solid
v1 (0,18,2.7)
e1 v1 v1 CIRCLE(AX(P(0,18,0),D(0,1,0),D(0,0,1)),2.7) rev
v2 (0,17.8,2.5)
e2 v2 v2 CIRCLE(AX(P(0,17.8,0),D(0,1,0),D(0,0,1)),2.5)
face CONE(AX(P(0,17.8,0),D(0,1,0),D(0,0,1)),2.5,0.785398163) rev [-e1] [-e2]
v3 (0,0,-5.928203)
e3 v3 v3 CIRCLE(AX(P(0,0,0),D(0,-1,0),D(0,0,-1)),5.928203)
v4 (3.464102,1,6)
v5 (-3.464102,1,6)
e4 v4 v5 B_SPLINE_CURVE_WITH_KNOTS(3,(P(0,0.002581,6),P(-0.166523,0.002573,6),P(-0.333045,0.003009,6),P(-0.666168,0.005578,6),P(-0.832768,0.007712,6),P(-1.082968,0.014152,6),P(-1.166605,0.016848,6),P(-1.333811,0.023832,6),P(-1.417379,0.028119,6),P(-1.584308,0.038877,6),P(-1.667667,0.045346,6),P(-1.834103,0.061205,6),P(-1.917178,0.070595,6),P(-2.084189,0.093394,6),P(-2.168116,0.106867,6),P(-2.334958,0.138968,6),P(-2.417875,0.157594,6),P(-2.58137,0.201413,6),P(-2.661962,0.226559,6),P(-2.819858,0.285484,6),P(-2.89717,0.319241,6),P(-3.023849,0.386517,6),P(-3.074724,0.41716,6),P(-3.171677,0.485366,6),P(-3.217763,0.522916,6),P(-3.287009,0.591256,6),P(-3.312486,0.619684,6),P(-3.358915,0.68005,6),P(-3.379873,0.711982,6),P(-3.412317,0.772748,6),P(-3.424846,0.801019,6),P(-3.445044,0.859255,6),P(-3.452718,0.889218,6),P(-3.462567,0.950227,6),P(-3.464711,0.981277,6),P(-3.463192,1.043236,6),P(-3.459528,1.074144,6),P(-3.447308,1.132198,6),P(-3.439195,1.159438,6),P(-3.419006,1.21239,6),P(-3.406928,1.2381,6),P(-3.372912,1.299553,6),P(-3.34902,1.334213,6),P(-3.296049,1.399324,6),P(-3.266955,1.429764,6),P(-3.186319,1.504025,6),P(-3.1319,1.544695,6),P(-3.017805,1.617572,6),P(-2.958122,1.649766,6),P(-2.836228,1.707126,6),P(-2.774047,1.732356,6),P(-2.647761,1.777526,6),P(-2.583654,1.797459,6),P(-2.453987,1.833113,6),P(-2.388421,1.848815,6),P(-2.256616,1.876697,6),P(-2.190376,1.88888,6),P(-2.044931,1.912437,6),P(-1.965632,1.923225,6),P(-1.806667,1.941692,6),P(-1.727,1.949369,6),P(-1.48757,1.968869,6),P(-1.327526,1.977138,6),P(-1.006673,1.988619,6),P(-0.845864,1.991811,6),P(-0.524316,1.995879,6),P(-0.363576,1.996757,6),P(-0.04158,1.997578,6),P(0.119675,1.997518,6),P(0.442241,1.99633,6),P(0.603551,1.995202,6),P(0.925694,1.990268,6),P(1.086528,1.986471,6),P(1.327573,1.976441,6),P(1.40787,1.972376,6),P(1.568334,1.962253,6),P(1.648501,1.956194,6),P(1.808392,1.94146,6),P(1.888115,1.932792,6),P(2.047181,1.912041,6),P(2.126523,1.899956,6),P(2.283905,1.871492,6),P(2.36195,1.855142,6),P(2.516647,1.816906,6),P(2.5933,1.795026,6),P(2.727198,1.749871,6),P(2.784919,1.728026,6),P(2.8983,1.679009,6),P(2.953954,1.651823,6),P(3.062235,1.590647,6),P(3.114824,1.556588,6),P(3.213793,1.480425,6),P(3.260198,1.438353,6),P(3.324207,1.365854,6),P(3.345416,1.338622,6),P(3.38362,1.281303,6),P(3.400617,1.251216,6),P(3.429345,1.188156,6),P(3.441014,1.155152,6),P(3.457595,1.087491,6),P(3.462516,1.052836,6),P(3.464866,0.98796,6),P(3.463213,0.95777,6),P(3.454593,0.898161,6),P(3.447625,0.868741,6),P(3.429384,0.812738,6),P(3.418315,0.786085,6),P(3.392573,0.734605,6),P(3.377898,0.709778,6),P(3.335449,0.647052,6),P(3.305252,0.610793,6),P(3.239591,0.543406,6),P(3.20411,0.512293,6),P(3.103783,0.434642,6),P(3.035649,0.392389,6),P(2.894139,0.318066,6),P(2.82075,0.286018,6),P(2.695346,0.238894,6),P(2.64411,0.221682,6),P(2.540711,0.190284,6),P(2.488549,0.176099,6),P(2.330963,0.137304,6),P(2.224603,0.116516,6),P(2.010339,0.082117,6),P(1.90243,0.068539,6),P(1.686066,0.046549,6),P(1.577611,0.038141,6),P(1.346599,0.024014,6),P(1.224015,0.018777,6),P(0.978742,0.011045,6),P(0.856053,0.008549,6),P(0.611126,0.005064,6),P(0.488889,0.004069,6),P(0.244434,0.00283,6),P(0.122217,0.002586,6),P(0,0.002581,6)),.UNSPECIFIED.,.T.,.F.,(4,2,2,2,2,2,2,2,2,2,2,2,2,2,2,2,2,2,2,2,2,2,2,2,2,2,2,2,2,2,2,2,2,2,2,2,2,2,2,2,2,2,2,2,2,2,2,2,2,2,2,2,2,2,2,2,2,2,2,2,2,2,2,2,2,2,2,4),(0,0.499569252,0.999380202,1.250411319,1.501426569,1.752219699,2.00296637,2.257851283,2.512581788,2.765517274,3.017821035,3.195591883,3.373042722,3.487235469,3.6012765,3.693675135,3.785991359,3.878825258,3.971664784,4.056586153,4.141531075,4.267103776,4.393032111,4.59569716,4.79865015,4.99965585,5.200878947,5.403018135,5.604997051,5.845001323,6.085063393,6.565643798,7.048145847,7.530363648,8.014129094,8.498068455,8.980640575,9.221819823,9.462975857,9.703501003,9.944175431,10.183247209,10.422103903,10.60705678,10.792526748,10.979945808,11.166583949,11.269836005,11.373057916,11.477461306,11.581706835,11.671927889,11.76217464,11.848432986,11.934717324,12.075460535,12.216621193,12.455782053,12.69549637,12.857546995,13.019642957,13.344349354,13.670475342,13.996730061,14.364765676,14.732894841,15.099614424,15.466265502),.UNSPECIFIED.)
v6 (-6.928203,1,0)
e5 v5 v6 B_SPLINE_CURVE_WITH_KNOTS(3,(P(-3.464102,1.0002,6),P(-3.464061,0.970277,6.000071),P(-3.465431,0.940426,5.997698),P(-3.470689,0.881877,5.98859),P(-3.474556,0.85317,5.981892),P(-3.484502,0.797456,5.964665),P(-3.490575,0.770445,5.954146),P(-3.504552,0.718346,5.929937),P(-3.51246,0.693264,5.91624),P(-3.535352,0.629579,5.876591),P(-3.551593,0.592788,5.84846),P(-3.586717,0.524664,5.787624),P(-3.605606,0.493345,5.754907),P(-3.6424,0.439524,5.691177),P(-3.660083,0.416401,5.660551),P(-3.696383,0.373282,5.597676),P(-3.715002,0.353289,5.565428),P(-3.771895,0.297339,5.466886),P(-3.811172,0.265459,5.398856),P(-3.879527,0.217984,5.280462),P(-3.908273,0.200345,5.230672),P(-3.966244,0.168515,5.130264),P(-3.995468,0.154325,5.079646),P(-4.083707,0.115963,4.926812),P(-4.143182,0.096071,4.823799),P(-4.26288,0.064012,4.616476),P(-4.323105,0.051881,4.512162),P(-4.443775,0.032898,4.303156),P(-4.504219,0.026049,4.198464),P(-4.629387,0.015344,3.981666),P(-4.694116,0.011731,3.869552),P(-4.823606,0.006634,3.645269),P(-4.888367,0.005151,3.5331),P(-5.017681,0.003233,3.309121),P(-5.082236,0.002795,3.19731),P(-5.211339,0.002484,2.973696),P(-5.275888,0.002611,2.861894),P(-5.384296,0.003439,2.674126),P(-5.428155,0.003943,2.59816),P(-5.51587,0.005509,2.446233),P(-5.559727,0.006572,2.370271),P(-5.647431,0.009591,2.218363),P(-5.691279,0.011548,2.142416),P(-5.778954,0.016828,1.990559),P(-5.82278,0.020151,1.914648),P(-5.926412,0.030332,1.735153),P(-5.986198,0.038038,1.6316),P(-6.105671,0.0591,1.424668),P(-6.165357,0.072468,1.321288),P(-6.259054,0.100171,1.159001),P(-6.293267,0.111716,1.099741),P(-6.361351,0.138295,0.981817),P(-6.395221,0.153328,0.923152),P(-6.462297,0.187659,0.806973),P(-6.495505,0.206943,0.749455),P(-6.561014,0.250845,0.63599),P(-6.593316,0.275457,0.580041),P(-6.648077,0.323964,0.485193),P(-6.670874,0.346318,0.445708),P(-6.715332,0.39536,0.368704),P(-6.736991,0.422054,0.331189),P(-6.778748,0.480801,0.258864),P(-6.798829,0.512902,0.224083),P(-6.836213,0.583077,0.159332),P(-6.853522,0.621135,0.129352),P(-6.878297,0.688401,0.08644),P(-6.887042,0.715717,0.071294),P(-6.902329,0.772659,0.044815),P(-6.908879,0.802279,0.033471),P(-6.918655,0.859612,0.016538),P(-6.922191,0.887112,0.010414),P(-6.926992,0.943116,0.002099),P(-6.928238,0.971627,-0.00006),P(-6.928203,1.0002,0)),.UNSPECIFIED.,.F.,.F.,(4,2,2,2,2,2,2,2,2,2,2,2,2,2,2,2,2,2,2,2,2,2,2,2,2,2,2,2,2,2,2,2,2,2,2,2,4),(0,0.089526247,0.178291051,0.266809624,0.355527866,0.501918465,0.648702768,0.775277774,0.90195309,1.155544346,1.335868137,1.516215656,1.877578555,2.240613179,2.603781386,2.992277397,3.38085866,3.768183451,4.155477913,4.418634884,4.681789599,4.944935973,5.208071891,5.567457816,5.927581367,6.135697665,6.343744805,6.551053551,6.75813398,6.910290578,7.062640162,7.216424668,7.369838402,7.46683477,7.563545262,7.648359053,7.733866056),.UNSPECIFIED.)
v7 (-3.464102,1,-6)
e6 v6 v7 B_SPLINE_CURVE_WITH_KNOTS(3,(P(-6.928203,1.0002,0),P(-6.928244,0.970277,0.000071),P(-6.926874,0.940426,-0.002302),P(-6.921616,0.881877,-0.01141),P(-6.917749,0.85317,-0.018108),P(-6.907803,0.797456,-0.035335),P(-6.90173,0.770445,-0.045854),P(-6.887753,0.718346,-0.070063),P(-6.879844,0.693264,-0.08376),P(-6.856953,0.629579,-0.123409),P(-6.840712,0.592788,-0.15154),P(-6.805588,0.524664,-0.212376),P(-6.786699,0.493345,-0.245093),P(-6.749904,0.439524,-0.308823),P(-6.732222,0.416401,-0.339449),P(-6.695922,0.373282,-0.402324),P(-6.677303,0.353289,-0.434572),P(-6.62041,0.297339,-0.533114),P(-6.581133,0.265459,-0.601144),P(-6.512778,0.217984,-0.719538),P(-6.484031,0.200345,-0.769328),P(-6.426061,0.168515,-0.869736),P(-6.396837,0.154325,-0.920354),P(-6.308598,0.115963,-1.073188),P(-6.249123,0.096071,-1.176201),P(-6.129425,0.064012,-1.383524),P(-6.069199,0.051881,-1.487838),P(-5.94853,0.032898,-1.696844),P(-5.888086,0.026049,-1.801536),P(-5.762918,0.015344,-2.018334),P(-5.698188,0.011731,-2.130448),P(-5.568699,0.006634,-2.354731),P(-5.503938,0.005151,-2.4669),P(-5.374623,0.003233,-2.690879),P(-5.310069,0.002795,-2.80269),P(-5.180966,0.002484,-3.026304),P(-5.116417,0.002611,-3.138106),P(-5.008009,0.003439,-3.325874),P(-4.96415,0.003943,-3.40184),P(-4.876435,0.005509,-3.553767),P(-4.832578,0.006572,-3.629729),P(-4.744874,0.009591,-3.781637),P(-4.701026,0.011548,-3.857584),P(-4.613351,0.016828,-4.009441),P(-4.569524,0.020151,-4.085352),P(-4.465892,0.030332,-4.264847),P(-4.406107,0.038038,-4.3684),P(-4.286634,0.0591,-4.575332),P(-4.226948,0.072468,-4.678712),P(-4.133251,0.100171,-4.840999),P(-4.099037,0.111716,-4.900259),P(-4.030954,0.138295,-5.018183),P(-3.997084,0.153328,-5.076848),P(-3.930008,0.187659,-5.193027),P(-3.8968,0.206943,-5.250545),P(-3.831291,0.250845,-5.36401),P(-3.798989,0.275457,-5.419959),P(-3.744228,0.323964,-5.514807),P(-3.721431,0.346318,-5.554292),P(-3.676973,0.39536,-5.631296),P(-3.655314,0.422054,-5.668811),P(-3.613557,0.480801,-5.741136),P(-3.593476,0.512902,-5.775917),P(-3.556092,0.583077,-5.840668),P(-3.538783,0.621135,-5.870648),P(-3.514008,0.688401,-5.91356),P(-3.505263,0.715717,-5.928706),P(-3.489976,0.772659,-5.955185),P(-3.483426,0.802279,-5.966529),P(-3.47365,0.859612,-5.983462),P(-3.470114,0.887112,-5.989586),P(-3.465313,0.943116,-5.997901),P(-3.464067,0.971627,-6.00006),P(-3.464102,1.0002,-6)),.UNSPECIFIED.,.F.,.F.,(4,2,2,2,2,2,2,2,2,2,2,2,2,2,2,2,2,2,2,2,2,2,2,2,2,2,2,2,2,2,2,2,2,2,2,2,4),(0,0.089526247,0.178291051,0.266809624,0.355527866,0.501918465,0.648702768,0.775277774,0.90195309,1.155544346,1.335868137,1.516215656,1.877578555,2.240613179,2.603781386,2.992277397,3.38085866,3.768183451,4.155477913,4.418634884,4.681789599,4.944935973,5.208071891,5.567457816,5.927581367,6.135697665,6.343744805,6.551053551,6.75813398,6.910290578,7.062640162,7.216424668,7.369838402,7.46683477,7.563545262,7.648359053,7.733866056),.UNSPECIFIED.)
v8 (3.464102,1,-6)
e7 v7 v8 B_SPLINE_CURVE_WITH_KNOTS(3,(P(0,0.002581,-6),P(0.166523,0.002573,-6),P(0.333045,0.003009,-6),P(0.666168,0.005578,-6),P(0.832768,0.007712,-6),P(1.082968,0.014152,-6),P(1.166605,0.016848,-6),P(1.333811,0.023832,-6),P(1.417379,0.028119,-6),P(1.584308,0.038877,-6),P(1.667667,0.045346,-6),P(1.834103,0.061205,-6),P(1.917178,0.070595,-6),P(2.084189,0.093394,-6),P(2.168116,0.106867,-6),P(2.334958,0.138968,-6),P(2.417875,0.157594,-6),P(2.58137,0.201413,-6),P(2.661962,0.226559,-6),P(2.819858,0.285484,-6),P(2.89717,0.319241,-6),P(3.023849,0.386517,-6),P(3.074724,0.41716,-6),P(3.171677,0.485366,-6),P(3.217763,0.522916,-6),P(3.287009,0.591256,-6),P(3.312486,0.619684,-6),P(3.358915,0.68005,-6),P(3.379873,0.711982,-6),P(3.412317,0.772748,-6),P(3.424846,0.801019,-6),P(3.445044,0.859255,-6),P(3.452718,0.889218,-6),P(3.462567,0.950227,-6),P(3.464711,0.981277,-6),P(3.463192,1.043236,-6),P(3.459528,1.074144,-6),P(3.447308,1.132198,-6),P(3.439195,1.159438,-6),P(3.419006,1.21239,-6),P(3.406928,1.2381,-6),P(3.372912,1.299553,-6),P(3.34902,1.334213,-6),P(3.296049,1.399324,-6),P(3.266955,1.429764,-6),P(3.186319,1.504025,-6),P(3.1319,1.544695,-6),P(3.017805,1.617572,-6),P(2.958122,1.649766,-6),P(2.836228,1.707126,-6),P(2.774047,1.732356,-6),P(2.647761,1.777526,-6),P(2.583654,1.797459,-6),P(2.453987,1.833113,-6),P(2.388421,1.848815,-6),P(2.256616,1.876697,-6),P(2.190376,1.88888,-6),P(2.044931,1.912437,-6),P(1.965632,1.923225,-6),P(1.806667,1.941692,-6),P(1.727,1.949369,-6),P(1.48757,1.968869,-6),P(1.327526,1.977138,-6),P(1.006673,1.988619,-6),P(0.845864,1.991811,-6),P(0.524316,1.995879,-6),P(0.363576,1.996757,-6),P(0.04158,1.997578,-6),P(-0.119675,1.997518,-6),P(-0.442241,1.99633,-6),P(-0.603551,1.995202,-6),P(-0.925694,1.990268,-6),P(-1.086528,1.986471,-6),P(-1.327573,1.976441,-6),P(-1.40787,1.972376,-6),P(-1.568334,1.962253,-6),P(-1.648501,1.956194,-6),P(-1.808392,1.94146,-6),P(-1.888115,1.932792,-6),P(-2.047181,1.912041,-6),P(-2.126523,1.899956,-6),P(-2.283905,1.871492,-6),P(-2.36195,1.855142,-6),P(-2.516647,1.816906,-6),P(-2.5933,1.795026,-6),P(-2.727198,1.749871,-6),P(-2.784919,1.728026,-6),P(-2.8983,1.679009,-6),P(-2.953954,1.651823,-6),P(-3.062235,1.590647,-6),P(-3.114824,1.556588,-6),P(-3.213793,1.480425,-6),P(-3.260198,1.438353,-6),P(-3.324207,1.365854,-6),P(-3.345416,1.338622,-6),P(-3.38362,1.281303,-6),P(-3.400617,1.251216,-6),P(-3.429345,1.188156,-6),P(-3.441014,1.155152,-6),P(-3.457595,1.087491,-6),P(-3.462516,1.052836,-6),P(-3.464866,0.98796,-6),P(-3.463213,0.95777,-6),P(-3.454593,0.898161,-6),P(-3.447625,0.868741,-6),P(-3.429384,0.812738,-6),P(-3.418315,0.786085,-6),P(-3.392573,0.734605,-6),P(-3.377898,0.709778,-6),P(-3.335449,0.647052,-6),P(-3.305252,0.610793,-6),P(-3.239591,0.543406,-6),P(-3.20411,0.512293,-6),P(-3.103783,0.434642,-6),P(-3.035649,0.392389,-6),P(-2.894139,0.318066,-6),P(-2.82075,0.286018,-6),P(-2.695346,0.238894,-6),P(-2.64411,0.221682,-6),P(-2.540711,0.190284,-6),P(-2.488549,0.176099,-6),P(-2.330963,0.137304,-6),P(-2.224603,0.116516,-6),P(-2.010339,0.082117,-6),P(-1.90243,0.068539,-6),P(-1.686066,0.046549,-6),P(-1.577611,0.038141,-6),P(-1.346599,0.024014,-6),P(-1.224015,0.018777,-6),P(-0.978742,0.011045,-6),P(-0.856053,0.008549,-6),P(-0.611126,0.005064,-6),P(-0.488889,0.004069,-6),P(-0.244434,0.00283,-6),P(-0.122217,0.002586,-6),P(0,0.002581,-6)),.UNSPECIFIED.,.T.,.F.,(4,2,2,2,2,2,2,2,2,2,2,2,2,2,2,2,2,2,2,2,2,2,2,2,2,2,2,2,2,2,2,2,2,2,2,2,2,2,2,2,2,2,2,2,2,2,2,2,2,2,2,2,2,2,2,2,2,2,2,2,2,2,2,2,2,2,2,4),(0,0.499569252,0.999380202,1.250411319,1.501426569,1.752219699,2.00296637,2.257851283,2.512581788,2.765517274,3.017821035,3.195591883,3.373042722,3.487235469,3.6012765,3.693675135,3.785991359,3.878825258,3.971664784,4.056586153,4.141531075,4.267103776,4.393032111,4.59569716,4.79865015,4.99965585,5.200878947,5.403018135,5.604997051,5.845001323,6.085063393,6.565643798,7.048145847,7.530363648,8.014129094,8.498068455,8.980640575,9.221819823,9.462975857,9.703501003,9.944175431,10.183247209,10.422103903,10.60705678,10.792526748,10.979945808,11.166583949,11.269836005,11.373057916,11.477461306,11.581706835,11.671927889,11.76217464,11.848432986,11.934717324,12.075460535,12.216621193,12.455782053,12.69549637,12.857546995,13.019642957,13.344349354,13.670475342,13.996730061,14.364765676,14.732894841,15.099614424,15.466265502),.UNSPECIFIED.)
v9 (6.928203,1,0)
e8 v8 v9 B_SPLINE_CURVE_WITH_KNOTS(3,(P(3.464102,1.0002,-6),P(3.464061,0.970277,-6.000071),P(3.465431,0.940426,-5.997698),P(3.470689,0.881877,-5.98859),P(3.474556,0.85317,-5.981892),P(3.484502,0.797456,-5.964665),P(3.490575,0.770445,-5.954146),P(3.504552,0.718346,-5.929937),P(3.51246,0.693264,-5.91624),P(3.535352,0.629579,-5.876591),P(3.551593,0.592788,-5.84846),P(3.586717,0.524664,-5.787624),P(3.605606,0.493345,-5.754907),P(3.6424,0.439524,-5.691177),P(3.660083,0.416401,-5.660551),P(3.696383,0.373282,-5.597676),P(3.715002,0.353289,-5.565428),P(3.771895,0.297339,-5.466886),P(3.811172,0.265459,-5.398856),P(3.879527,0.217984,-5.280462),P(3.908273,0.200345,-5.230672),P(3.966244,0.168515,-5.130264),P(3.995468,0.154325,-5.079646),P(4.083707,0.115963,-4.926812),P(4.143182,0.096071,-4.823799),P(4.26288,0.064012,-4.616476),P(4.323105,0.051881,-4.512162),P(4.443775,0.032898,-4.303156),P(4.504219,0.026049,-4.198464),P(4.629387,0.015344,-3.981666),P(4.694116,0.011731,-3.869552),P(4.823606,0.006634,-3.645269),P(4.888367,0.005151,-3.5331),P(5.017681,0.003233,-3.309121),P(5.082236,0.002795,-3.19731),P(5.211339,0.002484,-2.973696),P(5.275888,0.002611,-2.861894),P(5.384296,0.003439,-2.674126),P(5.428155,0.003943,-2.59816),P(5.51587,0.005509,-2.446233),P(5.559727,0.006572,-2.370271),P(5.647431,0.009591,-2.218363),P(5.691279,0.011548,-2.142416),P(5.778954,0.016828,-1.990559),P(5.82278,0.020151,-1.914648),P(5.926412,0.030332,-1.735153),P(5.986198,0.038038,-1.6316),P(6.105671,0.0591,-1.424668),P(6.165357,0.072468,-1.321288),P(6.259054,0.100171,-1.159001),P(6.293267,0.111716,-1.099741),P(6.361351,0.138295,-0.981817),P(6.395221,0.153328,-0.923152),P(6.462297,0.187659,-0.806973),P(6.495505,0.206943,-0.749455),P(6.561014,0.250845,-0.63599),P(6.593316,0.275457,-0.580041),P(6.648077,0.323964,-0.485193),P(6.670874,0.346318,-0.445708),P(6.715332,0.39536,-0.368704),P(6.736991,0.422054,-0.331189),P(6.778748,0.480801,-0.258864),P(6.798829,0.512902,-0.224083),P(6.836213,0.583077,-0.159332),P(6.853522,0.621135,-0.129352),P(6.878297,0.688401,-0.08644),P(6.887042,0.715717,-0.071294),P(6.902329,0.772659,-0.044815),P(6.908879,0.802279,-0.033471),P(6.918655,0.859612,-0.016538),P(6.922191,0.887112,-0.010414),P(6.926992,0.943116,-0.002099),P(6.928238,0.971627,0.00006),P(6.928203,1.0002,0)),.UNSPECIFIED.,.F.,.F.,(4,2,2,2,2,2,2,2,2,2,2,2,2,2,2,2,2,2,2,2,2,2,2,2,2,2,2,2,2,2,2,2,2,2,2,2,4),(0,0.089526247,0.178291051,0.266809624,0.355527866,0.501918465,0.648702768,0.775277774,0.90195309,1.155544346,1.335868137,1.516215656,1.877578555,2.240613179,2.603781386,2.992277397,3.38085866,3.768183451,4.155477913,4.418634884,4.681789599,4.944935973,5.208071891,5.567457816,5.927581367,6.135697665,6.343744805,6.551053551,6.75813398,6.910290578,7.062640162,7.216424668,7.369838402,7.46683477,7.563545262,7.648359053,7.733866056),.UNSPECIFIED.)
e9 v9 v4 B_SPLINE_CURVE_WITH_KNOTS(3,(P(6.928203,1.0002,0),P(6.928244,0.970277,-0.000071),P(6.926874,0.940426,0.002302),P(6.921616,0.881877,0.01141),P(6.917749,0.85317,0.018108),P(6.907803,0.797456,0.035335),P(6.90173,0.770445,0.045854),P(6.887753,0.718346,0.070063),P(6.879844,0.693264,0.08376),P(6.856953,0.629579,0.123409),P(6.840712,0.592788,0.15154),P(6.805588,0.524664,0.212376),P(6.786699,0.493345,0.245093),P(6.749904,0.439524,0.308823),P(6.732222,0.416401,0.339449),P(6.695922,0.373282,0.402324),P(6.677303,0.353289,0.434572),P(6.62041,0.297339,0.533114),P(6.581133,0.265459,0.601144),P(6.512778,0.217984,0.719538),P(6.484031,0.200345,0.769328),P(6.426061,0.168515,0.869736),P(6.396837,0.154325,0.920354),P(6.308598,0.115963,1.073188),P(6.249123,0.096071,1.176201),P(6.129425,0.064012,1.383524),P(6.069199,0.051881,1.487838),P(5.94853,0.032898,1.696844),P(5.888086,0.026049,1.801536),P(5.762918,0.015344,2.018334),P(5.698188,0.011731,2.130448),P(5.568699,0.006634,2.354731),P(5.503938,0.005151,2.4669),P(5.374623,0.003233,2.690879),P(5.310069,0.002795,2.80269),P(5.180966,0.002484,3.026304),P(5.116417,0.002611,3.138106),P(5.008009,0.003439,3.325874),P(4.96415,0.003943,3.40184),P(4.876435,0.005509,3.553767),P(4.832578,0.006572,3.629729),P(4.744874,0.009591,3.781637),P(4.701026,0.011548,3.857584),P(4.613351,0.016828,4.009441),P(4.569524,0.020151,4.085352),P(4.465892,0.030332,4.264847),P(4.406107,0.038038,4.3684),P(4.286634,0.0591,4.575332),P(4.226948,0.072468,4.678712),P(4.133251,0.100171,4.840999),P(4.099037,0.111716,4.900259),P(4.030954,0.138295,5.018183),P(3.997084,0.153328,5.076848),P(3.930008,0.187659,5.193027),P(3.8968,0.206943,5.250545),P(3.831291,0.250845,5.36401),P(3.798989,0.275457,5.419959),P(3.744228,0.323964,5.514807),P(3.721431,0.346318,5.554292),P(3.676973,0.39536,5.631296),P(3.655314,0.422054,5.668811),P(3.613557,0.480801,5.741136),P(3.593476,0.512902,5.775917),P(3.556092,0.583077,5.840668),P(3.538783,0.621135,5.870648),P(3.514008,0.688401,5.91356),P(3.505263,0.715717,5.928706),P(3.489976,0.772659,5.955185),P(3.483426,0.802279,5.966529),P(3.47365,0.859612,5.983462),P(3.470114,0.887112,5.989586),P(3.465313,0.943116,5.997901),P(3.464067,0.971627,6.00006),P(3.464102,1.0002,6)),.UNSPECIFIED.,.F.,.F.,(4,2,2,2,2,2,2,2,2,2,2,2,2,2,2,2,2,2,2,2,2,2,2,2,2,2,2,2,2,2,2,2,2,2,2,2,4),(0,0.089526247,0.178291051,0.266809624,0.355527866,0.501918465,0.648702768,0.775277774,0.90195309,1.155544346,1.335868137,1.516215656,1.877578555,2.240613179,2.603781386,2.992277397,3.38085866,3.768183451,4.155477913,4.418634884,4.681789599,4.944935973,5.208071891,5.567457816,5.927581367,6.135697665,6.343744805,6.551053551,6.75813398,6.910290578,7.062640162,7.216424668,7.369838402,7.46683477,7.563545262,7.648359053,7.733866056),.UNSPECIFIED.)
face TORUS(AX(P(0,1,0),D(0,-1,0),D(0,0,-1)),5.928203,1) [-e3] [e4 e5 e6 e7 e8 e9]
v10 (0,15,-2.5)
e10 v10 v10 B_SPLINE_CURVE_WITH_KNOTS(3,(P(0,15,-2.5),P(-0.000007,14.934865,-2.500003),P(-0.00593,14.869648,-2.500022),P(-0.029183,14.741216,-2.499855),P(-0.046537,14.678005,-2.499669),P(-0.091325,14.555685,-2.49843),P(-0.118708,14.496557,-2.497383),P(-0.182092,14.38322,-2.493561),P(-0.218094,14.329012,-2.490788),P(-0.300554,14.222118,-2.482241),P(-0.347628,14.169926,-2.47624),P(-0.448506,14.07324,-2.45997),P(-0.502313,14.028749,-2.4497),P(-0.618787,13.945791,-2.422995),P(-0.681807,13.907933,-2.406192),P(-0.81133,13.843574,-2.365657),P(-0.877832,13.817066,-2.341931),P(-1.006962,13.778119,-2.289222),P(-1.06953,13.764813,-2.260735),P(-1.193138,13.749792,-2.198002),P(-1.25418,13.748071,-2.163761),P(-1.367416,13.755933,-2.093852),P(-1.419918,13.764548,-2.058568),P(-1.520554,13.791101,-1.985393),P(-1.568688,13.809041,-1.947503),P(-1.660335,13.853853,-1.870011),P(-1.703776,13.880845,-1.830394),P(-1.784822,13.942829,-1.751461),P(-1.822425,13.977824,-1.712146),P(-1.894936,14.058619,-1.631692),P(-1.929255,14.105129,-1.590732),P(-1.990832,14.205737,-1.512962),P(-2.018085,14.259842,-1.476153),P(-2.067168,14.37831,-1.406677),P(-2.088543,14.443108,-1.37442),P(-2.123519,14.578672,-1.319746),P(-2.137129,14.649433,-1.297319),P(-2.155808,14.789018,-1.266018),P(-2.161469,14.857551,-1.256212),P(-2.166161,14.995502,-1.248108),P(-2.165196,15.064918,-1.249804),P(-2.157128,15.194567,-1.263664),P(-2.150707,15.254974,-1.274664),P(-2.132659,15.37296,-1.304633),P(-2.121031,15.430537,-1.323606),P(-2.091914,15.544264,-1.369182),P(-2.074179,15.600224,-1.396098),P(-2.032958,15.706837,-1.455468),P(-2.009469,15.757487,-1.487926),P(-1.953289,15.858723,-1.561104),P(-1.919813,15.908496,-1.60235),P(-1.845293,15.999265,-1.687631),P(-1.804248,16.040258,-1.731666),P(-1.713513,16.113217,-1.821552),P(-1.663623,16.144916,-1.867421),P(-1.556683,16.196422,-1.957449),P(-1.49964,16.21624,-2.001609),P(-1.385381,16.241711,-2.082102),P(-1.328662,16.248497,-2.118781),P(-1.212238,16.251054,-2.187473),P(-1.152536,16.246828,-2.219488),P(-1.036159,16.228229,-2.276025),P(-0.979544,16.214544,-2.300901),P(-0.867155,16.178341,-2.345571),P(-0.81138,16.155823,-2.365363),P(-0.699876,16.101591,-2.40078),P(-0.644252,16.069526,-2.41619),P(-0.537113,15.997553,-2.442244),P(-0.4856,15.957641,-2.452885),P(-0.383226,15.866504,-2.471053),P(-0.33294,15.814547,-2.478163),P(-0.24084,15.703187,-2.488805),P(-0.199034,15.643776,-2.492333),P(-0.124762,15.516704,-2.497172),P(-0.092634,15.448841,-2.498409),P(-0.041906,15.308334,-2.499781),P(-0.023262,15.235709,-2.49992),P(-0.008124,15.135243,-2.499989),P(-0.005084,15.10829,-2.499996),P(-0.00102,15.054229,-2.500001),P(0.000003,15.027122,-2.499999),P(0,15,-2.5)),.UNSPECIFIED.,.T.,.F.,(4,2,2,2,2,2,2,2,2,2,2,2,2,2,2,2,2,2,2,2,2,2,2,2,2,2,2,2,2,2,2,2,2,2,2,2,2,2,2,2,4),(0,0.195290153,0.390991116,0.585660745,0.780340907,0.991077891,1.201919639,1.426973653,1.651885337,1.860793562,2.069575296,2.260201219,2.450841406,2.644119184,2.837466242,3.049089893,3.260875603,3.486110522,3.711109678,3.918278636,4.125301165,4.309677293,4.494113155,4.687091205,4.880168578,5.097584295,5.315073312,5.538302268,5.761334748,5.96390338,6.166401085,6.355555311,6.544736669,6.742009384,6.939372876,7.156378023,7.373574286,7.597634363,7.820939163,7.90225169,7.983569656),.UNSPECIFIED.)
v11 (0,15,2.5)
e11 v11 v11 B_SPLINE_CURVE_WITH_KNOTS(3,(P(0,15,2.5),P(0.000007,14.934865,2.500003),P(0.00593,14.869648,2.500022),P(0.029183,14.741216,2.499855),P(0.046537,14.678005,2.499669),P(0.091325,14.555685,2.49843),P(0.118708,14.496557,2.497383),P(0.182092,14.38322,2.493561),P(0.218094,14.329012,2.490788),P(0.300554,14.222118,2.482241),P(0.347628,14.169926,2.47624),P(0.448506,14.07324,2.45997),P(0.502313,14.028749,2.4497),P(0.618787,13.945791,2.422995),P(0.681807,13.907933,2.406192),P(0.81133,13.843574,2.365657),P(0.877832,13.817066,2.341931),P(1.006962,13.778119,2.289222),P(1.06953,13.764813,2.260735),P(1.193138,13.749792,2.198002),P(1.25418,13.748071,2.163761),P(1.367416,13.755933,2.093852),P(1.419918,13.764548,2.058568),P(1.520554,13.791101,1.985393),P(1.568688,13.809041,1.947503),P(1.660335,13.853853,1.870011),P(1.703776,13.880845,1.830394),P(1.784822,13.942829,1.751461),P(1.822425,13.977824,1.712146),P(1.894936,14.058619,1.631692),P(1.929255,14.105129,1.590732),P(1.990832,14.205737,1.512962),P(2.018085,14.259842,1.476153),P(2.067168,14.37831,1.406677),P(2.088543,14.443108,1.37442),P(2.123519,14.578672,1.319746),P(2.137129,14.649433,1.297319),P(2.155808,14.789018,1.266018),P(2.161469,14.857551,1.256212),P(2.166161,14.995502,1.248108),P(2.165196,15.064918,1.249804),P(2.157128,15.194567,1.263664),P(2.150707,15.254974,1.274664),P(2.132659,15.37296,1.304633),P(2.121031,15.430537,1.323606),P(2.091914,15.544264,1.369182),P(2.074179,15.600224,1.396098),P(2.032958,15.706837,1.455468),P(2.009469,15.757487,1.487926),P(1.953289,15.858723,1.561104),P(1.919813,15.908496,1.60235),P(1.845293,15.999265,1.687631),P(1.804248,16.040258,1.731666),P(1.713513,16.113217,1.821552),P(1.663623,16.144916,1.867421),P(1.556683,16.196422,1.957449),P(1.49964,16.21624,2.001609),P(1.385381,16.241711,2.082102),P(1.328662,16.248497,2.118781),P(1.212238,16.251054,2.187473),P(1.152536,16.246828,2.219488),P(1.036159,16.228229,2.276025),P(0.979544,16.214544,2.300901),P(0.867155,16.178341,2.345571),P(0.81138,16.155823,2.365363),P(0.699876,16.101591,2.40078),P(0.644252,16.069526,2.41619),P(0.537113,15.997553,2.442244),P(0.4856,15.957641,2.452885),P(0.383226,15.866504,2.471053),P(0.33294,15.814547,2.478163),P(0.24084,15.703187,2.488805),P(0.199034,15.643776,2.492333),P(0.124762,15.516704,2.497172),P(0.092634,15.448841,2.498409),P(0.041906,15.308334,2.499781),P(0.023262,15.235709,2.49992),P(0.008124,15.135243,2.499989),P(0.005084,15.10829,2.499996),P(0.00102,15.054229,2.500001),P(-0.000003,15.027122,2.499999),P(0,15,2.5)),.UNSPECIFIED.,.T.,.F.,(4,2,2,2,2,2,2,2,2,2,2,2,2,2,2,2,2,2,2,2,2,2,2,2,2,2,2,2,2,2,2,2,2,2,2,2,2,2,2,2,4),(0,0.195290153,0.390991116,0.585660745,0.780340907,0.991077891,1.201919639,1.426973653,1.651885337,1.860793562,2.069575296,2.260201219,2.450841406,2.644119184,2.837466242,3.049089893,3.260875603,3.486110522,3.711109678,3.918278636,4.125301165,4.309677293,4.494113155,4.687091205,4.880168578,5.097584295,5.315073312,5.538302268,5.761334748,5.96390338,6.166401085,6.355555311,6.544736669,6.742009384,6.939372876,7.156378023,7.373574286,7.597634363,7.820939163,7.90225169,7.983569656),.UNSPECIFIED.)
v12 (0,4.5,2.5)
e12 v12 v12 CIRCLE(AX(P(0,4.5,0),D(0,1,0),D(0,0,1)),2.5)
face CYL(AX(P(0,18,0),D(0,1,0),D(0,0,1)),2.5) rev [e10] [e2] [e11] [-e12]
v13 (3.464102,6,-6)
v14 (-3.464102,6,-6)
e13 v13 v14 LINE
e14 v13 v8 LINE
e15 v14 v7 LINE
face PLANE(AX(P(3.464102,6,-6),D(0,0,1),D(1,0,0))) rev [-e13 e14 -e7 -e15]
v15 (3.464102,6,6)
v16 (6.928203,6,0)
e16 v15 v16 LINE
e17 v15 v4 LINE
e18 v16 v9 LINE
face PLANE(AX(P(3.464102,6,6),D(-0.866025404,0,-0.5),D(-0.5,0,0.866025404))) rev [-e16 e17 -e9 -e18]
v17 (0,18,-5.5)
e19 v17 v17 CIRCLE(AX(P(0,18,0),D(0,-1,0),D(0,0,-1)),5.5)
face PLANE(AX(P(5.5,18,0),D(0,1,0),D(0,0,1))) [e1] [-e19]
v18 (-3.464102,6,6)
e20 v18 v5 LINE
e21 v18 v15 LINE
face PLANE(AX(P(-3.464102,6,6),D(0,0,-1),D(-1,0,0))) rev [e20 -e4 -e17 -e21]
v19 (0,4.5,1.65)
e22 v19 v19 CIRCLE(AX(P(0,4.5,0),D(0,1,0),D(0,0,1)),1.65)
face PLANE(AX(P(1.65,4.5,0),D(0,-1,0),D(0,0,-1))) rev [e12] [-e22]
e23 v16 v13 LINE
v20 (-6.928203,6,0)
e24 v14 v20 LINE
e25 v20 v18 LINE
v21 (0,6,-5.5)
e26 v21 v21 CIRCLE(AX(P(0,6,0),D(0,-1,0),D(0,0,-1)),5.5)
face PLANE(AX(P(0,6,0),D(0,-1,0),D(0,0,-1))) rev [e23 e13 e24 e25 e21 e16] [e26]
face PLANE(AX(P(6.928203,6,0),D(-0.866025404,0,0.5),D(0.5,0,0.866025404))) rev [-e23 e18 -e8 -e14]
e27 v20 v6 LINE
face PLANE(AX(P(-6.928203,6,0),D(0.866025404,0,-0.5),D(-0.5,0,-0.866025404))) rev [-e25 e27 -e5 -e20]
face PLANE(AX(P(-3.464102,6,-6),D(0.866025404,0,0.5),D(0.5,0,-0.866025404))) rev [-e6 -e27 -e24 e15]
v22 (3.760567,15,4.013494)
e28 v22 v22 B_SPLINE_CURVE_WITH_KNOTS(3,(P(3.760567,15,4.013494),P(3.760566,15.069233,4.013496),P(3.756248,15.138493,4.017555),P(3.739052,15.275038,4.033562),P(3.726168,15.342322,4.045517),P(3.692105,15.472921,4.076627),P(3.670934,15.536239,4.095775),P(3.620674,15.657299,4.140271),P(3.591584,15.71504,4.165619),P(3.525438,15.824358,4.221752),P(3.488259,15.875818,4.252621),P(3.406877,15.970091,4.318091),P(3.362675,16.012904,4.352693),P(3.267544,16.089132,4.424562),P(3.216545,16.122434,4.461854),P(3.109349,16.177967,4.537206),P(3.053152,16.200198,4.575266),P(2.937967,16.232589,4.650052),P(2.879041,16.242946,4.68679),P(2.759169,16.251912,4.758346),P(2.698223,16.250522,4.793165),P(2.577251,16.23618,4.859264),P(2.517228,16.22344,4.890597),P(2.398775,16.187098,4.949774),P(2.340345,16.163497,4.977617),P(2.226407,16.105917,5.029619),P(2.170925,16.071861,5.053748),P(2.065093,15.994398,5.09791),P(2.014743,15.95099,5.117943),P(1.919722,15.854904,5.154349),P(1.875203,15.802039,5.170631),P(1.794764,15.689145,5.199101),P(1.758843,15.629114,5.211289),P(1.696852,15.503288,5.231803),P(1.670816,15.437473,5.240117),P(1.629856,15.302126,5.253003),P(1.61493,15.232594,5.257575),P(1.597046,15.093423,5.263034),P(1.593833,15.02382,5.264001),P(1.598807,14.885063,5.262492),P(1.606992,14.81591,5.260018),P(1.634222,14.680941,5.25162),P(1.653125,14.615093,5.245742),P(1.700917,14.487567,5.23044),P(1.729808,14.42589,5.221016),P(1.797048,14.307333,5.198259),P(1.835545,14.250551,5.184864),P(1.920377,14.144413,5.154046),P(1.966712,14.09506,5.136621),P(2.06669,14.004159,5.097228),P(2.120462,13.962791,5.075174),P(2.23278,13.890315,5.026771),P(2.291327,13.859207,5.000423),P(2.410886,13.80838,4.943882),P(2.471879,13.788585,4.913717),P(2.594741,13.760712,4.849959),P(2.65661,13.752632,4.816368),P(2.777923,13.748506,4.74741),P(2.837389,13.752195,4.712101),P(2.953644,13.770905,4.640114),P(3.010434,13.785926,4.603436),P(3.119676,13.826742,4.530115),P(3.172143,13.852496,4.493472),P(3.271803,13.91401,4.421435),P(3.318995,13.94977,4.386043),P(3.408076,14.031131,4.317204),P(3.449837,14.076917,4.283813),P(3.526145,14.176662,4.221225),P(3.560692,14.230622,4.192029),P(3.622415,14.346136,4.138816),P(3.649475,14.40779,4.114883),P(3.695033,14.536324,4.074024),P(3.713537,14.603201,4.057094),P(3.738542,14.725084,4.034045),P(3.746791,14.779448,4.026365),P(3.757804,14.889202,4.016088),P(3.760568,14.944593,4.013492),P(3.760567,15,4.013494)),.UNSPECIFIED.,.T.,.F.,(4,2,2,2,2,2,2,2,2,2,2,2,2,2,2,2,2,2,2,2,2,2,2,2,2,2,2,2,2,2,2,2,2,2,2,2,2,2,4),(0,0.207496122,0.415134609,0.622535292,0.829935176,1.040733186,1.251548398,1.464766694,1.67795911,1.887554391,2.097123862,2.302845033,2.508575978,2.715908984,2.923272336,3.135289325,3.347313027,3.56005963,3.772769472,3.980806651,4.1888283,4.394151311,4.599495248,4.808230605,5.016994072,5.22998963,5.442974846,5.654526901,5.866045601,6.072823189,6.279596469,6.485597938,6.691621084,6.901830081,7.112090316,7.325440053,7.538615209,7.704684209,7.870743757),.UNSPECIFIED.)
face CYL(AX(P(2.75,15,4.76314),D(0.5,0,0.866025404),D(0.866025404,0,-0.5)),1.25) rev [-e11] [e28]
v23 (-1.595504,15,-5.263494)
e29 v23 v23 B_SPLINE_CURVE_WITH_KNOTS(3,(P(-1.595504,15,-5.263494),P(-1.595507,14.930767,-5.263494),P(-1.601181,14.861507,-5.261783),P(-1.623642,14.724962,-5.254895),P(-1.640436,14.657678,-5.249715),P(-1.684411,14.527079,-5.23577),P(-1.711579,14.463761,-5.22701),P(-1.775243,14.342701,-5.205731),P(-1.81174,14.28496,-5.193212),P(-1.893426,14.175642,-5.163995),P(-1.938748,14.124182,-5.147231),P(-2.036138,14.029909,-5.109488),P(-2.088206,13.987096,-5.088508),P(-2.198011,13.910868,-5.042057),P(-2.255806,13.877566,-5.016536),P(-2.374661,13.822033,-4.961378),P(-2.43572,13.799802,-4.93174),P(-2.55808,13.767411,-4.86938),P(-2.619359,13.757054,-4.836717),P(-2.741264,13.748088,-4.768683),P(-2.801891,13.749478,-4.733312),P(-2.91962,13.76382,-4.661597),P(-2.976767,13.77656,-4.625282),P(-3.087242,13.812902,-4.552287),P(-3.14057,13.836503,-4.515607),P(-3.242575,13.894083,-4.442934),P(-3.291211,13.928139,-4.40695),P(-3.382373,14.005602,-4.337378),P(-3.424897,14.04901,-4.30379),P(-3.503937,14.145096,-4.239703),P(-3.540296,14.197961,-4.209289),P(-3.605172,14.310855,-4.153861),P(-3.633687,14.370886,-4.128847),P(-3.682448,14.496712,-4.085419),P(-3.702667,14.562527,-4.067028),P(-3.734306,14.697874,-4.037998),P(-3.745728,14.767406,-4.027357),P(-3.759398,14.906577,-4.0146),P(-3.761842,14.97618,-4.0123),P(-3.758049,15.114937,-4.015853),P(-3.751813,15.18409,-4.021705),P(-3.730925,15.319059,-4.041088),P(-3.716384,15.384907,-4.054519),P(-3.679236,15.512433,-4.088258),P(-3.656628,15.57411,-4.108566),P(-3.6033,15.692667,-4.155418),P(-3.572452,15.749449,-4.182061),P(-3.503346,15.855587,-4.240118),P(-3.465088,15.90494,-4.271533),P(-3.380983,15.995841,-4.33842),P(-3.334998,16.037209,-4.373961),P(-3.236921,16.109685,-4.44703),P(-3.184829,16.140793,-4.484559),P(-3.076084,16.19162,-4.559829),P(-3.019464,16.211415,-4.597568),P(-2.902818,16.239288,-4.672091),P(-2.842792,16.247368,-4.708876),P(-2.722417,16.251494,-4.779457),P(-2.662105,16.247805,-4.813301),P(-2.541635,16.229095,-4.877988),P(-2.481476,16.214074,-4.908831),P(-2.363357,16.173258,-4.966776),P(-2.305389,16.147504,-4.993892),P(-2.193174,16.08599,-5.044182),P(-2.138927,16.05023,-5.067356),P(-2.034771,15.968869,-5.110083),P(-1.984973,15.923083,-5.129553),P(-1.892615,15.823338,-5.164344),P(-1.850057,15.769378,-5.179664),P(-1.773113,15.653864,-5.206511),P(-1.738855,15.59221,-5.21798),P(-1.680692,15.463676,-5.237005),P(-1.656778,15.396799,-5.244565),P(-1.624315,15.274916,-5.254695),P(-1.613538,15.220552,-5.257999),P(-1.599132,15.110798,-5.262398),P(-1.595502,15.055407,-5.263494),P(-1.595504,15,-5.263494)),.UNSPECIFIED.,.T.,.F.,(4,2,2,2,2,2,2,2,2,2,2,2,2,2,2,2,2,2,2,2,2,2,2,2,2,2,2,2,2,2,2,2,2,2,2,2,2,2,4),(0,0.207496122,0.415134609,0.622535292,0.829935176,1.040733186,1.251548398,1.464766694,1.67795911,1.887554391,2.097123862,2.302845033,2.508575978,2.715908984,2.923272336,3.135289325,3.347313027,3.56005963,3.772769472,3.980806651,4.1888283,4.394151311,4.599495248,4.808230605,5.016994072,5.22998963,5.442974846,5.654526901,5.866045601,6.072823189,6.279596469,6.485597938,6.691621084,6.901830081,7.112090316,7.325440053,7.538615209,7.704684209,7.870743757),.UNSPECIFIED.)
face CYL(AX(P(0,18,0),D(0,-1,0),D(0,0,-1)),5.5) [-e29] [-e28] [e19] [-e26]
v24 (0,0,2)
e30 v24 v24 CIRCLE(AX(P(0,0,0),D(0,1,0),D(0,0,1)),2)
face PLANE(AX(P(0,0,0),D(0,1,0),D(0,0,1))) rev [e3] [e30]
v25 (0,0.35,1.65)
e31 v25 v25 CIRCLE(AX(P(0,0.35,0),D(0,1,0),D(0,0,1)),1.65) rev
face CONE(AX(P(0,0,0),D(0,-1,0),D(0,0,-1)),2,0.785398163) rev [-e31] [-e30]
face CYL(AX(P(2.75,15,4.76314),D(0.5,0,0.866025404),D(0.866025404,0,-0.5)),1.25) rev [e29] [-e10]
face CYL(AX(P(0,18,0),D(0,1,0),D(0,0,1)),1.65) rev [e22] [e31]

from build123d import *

# Parameters (mm, degrees)
BOSS_EXTRUDE1_DEPTH                              = 5
BOSS_EXTRUDE1_START                              = 0.002576877
BOSS_EXTRUDE1_3_OUTLINE_W                        = 16
BOSS_EXTRUDE1_3_OUTLINE_H                        = 16
BOSS_EXTRUDE1_3_DEPTH                            = 0.997423124
SKETCH2_W                                        = 5.5
SKETCH2_H                                        = 12
CBORE_FOR_M3_HEX_HEAD_MACHINE_SCREW1_D           = 3.3
CBORE_FOR_M3_HEX_HEAD_MACHINE_SCREW1_DEPTH       = 18.260356386
CBORE_FOR_M3_HEX_HEAD_MACHINE_SCREW1_CBORE_D     = 5
CBORE_FOR_M3_HEX_HEAD_MACHINE_SCREW1_CBORE_DEPTH = 13.5
F_2_5_2_5_DIAMETER_HOLE1_D                       = 2.5
F_2_5_2_5_DIAMETER_HOLE1_DEPTH                   = 14.334936491
CHAMFER1_SIZE                                    = 0.2
CHAMFER2_SIZE                                    = 0.35


with BuildPart() as part:
    # Boss-Extrude1: read off the stored shape, not the designer's step
    # Boss-Extrude1 outline → Boss-Extrude1 (new body)
    with BuildSketch(Plane(origin=(0, 1, 0), x_dir=(-1, 0, 0), z_dir=(0, 1, 0))):
        Polygon((3.464101615, 6), (-3.464101615, 6), (-6.92820323, 0), (-3.464101615, -6), (3.464101615, -6), (6.92820323, 0), align=None)
    extrude(amount=BOSS_EXTRUDE1_DEPTH)

    # Boss-Extrude1 2 outline → Boss-Extrude1 2 (revolve)
    with BuildSketch(Plane.XY):
        with BuildLine():
            Line((0, 1.000000001), (0, 0))
            Line((0, 0), (5.92820323, 0))
            ThreePointArc((5.92820323, 0), (6.635310012, 0.292893219), (6.92820323, 1.000000001))
            Line((6.92820323, 1.000000001), (0, 1.000000001))
        make_face()
    revolve(axis=Axis((0, 0, 0), (0, 1, 0)))

    # Boss-Extrude1 3 outline → Boss-Extrude1 3 (cut)
    with BuildSketch(Plane(origin=(0, 0, 0), x_dir=(1, 0, 0), z_dir=(0, 1, 0)).offset(BOSS_EXTRUDE1_START)):
        Rectangle(BOSS_EXTRUDE1_3_OUTLINE_W, BOSS_EXTRUDE1_3_OUTLINE_H)
        Polygon((6.92820323, 0), (3.464101615, -6), (-3.464101615, -6), (-6.92820323, 0), (-3.464101615, 6), (3.464101615, 6), align=None, mode=Mode.SUBTRACT)
    extrude(amount=BOSS_EXTRUDE1_3_DEPTH, mode=Mode.SUBTRACT)

    # Sketch2 → Revolve1 (revolve)
    with BuildSketch(Plane.XY, mode=Mode.PRIVATE) as revolve1_sk:
        with Locations((2.75, 12)):
            Rectangle(SKETCH2_W, SKETCH2_H)
    revolve(revolve1_sk.sketch.rotate(Axis((0, 18, 0), (0, -1, 0)), 270), axis=Axis((0, 18, 0), (0, -1, 0)))

    # CBORE for M3 Hex Head Machine Screw1
    with Locations(Plane(origin=(0, 18, 0), x_dir=(1, 0, 0), z_dir=(0, 1, 0))):
        with Locations((0, 0)):
            CounterBoreHole(CBORE_FOR_M3_HEX_HEAD_MACHINE_SCREW1_D / 2, CBORE_FOR_M3_HEX_HEAD_MACHINE_SCREW1_CBORE_D / 2, CBORE_FOR_M3_HEX_HEAD_MACHINE_SCREW1_CBORE_DEPTH, depth=CBORE_FOR_M3_HEX_HEAD_MACHINE_SCREW1_DEPTH)

    # Ø2.5 (2.5) Diameter Hole1
    with Locations(Plane(origin=(2.75, 15, 4.763139721), x_dir=(0.866025403784, 0, -0.5), z_dir=(0.5, 0, 0.866025403784))):
        with Locations((0, 0)):
            Hole(F_2_5_2_5_DIAMETER_HOLE1_D / 2, depth=F_2_5_2_5_DIAMETER_HOLE1_DEPTH)

    # Chamfer1
    chamfer1_edges = [part.edges().sort_by_distance(p)[0] for p in [
        (-2.5, 18, 0),
    ]]
    chamfer(chamfer1_edges, length=CHAMFER1_SIZE)

    # Chamfer2
    chamfer2_edges = [part.edges().sort_by_distance(p)[0] for p in [
        (1.65, 0, 0),
    ]]
    chamfer(chamfer2_edges, length=CHAMFER2_SIZE)


solid = part.part
